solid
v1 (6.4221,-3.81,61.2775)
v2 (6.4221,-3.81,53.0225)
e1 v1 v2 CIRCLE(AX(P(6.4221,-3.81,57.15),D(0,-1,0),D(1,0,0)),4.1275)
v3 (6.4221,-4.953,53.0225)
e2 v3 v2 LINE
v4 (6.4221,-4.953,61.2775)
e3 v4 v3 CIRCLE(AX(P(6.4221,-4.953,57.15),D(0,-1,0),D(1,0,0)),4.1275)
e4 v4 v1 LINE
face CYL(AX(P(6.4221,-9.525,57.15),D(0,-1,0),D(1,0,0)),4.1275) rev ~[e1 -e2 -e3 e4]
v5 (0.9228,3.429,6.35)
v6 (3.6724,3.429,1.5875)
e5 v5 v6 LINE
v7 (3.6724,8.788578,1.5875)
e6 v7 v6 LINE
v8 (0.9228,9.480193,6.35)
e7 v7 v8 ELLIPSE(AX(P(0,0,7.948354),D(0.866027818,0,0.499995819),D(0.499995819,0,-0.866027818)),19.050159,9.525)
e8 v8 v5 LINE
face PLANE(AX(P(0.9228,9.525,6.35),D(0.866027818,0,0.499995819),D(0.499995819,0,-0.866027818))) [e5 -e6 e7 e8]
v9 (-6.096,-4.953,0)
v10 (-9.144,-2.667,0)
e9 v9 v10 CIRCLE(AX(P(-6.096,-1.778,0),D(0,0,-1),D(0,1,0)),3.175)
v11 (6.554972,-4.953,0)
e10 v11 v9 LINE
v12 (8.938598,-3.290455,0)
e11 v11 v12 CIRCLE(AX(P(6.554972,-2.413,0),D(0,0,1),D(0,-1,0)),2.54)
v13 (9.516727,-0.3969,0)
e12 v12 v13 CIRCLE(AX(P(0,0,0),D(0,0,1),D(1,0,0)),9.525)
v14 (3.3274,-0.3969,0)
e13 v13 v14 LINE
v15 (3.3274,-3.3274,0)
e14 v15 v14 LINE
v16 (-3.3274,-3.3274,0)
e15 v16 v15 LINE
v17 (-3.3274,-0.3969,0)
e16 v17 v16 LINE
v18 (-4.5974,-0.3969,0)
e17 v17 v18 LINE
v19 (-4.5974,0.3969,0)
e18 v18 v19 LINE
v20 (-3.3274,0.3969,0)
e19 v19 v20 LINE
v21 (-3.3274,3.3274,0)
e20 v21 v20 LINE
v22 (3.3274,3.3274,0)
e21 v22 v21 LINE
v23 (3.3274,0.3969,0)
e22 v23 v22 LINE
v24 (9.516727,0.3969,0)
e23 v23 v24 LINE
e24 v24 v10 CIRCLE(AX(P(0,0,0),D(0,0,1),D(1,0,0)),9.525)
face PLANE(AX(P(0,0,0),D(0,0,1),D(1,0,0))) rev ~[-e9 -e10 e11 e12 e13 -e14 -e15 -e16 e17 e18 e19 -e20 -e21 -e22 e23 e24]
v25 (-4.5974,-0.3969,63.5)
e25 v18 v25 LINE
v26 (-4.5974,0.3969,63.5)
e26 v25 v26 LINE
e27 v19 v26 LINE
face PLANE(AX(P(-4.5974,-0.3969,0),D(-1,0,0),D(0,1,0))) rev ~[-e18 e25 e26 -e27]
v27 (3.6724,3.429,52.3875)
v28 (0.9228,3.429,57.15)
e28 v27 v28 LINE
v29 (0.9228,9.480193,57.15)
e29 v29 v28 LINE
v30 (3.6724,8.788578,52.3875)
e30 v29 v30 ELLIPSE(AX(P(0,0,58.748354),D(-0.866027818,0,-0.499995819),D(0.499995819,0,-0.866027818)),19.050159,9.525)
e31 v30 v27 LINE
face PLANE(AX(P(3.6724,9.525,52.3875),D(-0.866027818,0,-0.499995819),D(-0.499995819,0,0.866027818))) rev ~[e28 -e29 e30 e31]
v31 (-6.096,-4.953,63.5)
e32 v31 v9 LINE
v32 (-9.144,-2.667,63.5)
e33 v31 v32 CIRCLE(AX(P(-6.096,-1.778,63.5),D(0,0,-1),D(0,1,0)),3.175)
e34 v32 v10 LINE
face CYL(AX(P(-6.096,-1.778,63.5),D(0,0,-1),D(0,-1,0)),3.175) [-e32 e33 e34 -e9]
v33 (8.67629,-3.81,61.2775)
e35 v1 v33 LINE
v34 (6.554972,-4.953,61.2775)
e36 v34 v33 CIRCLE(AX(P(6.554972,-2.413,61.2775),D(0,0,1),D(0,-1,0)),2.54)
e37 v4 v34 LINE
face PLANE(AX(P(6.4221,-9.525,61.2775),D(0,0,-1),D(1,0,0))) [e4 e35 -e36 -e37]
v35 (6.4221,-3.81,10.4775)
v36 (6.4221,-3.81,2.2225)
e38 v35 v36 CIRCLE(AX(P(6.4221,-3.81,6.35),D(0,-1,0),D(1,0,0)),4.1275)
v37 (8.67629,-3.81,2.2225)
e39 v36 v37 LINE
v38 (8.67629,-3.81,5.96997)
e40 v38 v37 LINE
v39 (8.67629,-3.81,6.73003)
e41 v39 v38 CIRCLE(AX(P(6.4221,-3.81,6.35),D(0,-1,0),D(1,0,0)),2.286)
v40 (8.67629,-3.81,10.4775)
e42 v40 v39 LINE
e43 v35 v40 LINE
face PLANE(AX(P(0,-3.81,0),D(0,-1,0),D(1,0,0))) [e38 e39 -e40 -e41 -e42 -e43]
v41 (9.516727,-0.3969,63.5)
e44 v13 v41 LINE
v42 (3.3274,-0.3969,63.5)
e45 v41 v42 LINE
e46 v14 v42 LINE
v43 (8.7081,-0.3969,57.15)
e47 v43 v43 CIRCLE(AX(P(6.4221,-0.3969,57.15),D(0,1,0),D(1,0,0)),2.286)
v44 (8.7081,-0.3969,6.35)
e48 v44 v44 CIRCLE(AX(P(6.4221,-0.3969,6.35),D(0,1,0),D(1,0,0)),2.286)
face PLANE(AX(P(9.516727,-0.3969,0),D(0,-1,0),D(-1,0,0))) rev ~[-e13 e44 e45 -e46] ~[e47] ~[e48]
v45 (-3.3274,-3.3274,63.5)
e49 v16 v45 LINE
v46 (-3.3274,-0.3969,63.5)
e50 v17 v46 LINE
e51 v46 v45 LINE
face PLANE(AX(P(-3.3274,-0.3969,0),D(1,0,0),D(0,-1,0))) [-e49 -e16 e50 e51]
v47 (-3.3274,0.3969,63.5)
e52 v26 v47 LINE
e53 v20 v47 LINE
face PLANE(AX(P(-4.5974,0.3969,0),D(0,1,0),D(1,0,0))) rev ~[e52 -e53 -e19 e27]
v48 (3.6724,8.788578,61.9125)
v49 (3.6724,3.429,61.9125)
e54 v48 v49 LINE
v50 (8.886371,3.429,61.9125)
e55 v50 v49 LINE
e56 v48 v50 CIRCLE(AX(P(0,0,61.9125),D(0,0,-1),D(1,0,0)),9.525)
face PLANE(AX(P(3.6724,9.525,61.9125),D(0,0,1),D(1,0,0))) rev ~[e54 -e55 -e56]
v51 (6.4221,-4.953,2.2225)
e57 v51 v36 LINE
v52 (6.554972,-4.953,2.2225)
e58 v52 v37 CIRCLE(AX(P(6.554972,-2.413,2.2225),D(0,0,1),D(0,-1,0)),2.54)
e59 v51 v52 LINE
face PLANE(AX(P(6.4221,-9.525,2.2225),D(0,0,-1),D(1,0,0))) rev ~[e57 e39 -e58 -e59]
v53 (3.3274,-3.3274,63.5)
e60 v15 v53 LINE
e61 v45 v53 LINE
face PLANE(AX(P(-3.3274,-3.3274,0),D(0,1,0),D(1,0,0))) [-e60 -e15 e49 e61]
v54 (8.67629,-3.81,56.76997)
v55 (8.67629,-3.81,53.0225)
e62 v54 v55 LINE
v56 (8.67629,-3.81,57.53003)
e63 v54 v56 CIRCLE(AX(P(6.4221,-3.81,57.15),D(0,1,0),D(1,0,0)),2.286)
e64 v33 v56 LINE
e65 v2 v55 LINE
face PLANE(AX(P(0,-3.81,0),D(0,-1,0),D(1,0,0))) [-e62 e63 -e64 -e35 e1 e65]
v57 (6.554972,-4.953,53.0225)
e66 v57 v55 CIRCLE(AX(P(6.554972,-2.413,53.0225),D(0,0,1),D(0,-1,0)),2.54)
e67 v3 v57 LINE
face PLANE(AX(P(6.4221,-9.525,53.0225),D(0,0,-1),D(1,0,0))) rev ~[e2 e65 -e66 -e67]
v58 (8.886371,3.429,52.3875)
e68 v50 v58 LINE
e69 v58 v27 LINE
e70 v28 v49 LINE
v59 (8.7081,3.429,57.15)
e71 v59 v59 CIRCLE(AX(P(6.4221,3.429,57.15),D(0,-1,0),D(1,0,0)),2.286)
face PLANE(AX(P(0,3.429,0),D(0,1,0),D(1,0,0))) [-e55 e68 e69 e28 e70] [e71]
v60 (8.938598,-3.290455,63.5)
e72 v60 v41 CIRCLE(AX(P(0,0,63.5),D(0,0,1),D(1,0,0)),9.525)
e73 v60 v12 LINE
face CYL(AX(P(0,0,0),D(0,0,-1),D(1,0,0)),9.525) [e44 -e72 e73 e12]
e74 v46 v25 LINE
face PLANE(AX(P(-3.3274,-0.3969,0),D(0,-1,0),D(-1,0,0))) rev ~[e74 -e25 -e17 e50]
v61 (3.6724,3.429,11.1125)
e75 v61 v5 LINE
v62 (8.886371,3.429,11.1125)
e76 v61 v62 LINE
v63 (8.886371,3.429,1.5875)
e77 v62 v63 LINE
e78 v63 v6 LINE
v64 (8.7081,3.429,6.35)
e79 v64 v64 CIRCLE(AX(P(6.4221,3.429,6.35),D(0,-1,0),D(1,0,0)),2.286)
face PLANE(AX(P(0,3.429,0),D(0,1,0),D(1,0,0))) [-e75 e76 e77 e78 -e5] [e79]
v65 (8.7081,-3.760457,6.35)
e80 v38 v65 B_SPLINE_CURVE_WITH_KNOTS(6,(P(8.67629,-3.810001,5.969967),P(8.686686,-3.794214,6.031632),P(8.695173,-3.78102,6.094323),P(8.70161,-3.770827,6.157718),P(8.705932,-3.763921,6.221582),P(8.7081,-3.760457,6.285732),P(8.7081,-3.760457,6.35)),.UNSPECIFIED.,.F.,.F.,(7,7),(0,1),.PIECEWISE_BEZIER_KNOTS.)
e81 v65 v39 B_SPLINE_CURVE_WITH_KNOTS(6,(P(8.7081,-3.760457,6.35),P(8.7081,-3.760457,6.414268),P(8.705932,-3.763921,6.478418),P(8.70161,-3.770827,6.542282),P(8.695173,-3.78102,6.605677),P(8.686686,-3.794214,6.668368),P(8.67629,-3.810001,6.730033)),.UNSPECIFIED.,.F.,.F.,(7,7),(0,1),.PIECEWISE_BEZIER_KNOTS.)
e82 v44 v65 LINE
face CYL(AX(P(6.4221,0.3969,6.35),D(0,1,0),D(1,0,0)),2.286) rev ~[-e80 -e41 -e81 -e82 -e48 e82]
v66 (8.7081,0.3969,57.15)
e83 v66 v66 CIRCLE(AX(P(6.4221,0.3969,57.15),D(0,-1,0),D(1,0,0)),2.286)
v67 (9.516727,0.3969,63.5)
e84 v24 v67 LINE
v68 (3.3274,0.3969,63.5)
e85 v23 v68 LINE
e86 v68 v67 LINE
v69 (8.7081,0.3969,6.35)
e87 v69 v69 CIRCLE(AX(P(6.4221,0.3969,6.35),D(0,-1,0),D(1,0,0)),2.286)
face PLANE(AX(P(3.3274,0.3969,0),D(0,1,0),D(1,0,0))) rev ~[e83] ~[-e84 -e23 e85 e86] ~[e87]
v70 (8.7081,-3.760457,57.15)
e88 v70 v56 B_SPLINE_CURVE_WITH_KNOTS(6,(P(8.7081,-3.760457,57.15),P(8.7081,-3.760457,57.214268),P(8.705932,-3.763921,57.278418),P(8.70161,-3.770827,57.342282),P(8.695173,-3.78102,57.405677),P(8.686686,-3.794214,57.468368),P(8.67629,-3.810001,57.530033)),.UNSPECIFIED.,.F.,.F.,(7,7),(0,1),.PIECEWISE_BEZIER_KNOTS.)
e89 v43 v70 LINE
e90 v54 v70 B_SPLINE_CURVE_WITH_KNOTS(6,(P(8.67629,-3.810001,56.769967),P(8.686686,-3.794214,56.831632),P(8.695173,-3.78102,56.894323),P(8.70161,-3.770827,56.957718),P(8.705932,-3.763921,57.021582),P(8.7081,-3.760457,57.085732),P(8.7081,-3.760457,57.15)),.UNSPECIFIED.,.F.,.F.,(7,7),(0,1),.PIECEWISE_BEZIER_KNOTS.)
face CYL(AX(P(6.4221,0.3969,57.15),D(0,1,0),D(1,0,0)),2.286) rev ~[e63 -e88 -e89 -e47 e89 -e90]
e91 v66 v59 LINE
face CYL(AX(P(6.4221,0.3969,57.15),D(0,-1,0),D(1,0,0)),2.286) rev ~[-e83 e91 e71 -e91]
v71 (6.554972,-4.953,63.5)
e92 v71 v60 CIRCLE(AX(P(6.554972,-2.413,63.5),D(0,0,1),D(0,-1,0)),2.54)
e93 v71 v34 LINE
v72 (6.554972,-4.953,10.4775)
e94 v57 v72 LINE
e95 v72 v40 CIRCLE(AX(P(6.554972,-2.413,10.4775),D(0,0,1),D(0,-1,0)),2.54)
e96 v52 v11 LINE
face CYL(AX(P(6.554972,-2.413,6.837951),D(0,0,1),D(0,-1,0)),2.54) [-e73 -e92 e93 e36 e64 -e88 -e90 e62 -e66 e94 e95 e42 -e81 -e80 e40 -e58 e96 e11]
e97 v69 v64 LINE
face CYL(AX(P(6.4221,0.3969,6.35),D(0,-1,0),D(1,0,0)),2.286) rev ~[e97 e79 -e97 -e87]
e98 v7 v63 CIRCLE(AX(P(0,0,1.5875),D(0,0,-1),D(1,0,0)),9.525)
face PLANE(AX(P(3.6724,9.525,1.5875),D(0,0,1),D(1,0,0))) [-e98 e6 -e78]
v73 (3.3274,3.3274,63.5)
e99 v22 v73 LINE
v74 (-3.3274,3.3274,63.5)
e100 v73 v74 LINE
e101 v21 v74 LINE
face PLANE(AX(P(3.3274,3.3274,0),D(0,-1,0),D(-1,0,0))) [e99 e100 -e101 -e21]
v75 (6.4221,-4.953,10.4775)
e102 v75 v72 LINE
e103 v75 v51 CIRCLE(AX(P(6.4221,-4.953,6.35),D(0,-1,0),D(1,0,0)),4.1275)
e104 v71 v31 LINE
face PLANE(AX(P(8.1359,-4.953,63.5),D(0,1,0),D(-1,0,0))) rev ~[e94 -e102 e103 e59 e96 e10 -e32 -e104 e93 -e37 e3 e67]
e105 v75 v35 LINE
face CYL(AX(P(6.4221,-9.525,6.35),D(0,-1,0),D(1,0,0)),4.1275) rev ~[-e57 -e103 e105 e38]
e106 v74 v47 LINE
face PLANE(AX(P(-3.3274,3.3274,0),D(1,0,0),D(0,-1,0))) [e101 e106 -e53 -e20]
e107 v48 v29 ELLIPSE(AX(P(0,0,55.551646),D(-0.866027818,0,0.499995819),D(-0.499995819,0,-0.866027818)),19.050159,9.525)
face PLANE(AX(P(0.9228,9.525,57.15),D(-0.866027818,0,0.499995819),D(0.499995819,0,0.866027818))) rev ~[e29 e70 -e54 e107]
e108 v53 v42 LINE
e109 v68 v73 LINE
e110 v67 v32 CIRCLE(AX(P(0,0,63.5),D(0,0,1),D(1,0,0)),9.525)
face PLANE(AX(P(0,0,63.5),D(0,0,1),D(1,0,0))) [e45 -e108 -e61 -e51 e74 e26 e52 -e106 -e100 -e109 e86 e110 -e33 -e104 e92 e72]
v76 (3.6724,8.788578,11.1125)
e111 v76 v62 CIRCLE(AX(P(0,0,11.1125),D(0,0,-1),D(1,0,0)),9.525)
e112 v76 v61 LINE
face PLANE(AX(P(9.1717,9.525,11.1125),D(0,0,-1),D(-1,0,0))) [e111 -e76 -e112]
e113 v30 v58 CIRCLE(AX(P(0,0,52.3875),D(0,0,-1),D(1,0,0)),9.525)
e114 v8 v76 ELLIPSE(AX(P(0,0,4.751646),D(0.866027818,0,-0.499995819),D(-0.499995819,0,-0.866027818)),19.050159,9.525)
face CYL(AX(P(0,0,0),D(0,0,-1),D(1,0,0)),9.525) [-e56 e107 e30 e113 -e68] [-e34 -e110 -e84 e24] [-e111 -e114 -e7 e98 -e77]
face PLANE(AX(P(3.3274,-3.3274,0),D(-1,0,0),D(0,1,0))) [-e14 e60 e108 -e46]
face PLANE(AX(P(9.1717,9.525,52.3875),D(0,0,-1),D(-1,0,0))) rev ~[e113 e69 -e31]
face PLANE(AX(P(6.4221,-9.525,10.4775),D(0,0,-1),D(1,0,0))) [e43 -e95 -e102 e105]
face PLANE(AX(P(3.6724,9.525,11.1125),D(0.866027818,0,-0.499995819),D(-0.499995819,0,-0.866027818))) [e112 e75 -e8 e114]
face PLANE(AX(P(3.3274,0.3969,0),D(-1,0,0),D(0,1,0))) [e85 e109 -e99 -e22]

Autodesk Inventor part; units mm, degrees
ref_plane "YZ Plane" through (0, 0, 0) normal (1, 0, 0) x (0, 1, 0)
sketch "Sketch1" plane through (0, 0, 0) normal (0, 0, 1) x (1, 0, 0)
  line L0 (-3.3274, -3.3274) -> (3.3274, -3.3274)
  line L1 (3.3274, -3.3274) -> (3.3274, 3.3274)
  line L2 (3.3274, 3.3274) -> (-3.3274, 3.3274)
  line L3 (-3.3274, 3.3274) -> (-3.3274, -3.3274)
  line L4 (-3.3274, -3.3274) -> (3.3274, 3.3274) construction
  line L5 (3.3274, -3.3274) -> (-3.3274, 3.3274) construction
  circle A0 centre (0, 0) radius 9.525
  line L6 (-4.5974, 0.3969) -> (11.7358, 0.3969)
  line L7 (11.7358, 0.3969) -> (11.7358, -0.3969)
  line L8 (11.7358, -0.3969) -> (-4.5974, -0.3969)
  line L9 (-4.5974, -0.3969) -> (-4.5974, 0.3969)
  point P0 (-4.5974, 0)
  point P1 (-3.3274, -0.3969)
  point P2 (-3.3274, 0.3969)
  point P3 (3.3274, 0.3969)
  point P4 (9.5167, 0.3969)
  point P5 (9.5167, -0.3969)
  point P6 (3.3274, -0.3969)
  dimension "d0" = 6.6548
  dimension "d1" = 6.6548
  dimension "d2" = 19.05
  dimension "d3" = 0.7937
  dimension "d4" = 1.27
extrude "Extrusion1" add sketch "Sketch1" along normal blind 63.5 contours L0 L1 L8 A0 L6 L2 L3 L9
sketch "Sketch2" plane through (3.3274, 0.3969, 0) normal (0, -1, 0) x (1, 0, 0)
  circle A0 centre (3.0947, 57.15) radius 2.286
  line L0 (0, 63.5) -> (6.1893, 63.5) projected
  line L1 (6.1893, 0) -> (6.1893, 63.5) projected
  line L2 (6.1893, 31.75) -> (0, 31.75)
  line L3 (0, 0) -> (0, 63.5) projected
  circle A1 centre (3.0947, 6.35) radius 2.286
  point P0 (-3.3274, 0)
  point P1 (3.0947, 63.5)
  dimension "d7" = 4.572
  dimension "d8" = 6.35
extrude "Extrusion2" cut sketch "Sketch2" along normal mid plane 63.5 contours A0 | A1
ref_plane "Work Plane1" through (0, -9.525, 0) normal (0, -1, 0) x (1, 0, 0)
ref_plane "Work Plane2" through (0, 9.525, 0) normal (0, 1, 0) x (1, 0, 0)
sketch "Sketch3" plane through (0, -9.525, 0) normal (0, -1, 0) x (1, 0, 0)
  circle A0 centre (6.4221, 6.35) radius 2.286 projected
  circle A1 centre (6.4221, 6.35) radius 4.1275
  line L0 (6.4221, 10.4775) -> (9.5167, 10.4775)
  line L1 (9.5167, 0) -> (9.5167, 63.5) projected
  line L2 (6.4221, 2.2225) -> (9.5167, 2.2225)
  line L3 (-9.525, 0) -> (-9.525, 63.5) projected
  line L4 (-9.525, 31.75) -> (9.5167, 31.75)
  circle A2 centre (6.4221, 57.15) radius 4.1275
  line L5 (6.4221, 53.0225) -> (9.5167, 53.0225)
  line L6 (6.4221, 61.2775) -> (9.5167, 61.2775)
  point P0 (0, 0)
  dimension "d11" = 8.255
extrude "Extrusion3" cut sketch "Sketch3" against normal blind 5.715 contours A1 L1 | L0 L1 A1 | A1 L1 L2 | L5 A2 L1 | A2 L1 | A2 L6 L1 picked at (9.2472, 6.35) picked at (7.5728, 58.1798)
sketch "Sketch4" plane through (0, 9.525, 0) normal (0, 1, 0) x (1, 0, 0)
  circle A0 centre (6.4221, -6.35) radius 2.286 projected
  arc A1 (6.4221, -2.2225) -> (6.4221, -10.4775) centre (6.4221, -6.35) ccw projected
  line L0 (0.9228, -6.35) -> (3.6724, -1.5875)
  line L1 (3.6724, -1.5875) -> (9.1717, -1.5875)
  line L2 (9.1717, -1.5875) -> (11.9213, -6.35)
  line L3 (11.9213, -6.35) -> (9.1717, -11.1125)
  line L4 (9.1717, -11.1125) -> (3.6724, -11.1125)
  line L5 (3.6724, -11.1125) -> (0.9228, -6.35)
  line L6 (-9.525, 0) -> (-9.525, -63.5) projected
  line L7 (-9.525, -31.75) -> (9.525, -31.75)
  line L8 (9.1717, -11.1125) -> (11.7374, -11.1125)
  line L9 (11.7374, -11.1125) -> (11.7374, -1.5875)
  line L10 (11.7374, -1.5875) -> (9.1717, -1.5875)
  line L11 (0.9228, -57.15) -> (3.6724, -61.9125)
  line L12 (3.6724, -61.9125) -> (9.1717, -61.9125)
  line L13 (9.1717, -61.9125) -> (11.9213, -57.15)
  line L14 (11.9213, -57.15) -> (9.1717, -52.3875)
  line L15 (9.1717, -52.3875) -> (3.6724, -52.3875)
  line L16 (3.6724, -52.3875) -> (0.9228, -57.15)
  line L17 (9.1717, -52.3875) -> (11.7374, -52.3875)
  line L18 (11.7374, -52.3875) -> (11.7374, -61.9125)
  line L19 (11.7374, -61.9125) -> (9.1717, -61.9125)
  point P0 (0, 0)
  point P1 (11.7374, -6.6685)
  point P2 (11.7374, -6.0315)
  dimension "d16" = 9.525
extrude "Extrusion4" cut sketch "Sketch4" against normal blind 6.096 contours A0 | L0 L1 L2 L9 L3 L4 L5 | L10 L9 L2 | L3 L9 L8 | L16 L15 L14 L18 L13 L12 L11 | L13 L18 L19 | L17 L18 L14
sketch "Sketch5" plane through (0, 0, 63.5) normal (0, 0, 1) x (1, 0, 0)
  line L0 (4.1361, -3.81) -> (8.7081, -3.81) projected
  arc A0 (9.5167, 0.3969) -> (9.5167, -0.3969) centre (0, 0) ccw projected
  line L1 (8.1359, -4.953) -> (-8.1359, -4.953)
  arc A1 (-8.1359, -4.953) -> (8.1359, -4.953) centre (0, 0) ccw
  dimension "d17" = 1.143
extrude "Extrusion5" cut sketch "Sketch5" against normal up to surface (63.5 mm away)
fillet "Fillet1" radius 3.175 1 edges at (-8.1359, -4.953, 31.75)
fillet "Fillet2" radius 2.54 3 edges at (8.1359, -4.953, 31.75) (8.1359, -4.953, 62.3888) (8.1359, -4.953, 1.1112)
properties part number "AxleBar"
